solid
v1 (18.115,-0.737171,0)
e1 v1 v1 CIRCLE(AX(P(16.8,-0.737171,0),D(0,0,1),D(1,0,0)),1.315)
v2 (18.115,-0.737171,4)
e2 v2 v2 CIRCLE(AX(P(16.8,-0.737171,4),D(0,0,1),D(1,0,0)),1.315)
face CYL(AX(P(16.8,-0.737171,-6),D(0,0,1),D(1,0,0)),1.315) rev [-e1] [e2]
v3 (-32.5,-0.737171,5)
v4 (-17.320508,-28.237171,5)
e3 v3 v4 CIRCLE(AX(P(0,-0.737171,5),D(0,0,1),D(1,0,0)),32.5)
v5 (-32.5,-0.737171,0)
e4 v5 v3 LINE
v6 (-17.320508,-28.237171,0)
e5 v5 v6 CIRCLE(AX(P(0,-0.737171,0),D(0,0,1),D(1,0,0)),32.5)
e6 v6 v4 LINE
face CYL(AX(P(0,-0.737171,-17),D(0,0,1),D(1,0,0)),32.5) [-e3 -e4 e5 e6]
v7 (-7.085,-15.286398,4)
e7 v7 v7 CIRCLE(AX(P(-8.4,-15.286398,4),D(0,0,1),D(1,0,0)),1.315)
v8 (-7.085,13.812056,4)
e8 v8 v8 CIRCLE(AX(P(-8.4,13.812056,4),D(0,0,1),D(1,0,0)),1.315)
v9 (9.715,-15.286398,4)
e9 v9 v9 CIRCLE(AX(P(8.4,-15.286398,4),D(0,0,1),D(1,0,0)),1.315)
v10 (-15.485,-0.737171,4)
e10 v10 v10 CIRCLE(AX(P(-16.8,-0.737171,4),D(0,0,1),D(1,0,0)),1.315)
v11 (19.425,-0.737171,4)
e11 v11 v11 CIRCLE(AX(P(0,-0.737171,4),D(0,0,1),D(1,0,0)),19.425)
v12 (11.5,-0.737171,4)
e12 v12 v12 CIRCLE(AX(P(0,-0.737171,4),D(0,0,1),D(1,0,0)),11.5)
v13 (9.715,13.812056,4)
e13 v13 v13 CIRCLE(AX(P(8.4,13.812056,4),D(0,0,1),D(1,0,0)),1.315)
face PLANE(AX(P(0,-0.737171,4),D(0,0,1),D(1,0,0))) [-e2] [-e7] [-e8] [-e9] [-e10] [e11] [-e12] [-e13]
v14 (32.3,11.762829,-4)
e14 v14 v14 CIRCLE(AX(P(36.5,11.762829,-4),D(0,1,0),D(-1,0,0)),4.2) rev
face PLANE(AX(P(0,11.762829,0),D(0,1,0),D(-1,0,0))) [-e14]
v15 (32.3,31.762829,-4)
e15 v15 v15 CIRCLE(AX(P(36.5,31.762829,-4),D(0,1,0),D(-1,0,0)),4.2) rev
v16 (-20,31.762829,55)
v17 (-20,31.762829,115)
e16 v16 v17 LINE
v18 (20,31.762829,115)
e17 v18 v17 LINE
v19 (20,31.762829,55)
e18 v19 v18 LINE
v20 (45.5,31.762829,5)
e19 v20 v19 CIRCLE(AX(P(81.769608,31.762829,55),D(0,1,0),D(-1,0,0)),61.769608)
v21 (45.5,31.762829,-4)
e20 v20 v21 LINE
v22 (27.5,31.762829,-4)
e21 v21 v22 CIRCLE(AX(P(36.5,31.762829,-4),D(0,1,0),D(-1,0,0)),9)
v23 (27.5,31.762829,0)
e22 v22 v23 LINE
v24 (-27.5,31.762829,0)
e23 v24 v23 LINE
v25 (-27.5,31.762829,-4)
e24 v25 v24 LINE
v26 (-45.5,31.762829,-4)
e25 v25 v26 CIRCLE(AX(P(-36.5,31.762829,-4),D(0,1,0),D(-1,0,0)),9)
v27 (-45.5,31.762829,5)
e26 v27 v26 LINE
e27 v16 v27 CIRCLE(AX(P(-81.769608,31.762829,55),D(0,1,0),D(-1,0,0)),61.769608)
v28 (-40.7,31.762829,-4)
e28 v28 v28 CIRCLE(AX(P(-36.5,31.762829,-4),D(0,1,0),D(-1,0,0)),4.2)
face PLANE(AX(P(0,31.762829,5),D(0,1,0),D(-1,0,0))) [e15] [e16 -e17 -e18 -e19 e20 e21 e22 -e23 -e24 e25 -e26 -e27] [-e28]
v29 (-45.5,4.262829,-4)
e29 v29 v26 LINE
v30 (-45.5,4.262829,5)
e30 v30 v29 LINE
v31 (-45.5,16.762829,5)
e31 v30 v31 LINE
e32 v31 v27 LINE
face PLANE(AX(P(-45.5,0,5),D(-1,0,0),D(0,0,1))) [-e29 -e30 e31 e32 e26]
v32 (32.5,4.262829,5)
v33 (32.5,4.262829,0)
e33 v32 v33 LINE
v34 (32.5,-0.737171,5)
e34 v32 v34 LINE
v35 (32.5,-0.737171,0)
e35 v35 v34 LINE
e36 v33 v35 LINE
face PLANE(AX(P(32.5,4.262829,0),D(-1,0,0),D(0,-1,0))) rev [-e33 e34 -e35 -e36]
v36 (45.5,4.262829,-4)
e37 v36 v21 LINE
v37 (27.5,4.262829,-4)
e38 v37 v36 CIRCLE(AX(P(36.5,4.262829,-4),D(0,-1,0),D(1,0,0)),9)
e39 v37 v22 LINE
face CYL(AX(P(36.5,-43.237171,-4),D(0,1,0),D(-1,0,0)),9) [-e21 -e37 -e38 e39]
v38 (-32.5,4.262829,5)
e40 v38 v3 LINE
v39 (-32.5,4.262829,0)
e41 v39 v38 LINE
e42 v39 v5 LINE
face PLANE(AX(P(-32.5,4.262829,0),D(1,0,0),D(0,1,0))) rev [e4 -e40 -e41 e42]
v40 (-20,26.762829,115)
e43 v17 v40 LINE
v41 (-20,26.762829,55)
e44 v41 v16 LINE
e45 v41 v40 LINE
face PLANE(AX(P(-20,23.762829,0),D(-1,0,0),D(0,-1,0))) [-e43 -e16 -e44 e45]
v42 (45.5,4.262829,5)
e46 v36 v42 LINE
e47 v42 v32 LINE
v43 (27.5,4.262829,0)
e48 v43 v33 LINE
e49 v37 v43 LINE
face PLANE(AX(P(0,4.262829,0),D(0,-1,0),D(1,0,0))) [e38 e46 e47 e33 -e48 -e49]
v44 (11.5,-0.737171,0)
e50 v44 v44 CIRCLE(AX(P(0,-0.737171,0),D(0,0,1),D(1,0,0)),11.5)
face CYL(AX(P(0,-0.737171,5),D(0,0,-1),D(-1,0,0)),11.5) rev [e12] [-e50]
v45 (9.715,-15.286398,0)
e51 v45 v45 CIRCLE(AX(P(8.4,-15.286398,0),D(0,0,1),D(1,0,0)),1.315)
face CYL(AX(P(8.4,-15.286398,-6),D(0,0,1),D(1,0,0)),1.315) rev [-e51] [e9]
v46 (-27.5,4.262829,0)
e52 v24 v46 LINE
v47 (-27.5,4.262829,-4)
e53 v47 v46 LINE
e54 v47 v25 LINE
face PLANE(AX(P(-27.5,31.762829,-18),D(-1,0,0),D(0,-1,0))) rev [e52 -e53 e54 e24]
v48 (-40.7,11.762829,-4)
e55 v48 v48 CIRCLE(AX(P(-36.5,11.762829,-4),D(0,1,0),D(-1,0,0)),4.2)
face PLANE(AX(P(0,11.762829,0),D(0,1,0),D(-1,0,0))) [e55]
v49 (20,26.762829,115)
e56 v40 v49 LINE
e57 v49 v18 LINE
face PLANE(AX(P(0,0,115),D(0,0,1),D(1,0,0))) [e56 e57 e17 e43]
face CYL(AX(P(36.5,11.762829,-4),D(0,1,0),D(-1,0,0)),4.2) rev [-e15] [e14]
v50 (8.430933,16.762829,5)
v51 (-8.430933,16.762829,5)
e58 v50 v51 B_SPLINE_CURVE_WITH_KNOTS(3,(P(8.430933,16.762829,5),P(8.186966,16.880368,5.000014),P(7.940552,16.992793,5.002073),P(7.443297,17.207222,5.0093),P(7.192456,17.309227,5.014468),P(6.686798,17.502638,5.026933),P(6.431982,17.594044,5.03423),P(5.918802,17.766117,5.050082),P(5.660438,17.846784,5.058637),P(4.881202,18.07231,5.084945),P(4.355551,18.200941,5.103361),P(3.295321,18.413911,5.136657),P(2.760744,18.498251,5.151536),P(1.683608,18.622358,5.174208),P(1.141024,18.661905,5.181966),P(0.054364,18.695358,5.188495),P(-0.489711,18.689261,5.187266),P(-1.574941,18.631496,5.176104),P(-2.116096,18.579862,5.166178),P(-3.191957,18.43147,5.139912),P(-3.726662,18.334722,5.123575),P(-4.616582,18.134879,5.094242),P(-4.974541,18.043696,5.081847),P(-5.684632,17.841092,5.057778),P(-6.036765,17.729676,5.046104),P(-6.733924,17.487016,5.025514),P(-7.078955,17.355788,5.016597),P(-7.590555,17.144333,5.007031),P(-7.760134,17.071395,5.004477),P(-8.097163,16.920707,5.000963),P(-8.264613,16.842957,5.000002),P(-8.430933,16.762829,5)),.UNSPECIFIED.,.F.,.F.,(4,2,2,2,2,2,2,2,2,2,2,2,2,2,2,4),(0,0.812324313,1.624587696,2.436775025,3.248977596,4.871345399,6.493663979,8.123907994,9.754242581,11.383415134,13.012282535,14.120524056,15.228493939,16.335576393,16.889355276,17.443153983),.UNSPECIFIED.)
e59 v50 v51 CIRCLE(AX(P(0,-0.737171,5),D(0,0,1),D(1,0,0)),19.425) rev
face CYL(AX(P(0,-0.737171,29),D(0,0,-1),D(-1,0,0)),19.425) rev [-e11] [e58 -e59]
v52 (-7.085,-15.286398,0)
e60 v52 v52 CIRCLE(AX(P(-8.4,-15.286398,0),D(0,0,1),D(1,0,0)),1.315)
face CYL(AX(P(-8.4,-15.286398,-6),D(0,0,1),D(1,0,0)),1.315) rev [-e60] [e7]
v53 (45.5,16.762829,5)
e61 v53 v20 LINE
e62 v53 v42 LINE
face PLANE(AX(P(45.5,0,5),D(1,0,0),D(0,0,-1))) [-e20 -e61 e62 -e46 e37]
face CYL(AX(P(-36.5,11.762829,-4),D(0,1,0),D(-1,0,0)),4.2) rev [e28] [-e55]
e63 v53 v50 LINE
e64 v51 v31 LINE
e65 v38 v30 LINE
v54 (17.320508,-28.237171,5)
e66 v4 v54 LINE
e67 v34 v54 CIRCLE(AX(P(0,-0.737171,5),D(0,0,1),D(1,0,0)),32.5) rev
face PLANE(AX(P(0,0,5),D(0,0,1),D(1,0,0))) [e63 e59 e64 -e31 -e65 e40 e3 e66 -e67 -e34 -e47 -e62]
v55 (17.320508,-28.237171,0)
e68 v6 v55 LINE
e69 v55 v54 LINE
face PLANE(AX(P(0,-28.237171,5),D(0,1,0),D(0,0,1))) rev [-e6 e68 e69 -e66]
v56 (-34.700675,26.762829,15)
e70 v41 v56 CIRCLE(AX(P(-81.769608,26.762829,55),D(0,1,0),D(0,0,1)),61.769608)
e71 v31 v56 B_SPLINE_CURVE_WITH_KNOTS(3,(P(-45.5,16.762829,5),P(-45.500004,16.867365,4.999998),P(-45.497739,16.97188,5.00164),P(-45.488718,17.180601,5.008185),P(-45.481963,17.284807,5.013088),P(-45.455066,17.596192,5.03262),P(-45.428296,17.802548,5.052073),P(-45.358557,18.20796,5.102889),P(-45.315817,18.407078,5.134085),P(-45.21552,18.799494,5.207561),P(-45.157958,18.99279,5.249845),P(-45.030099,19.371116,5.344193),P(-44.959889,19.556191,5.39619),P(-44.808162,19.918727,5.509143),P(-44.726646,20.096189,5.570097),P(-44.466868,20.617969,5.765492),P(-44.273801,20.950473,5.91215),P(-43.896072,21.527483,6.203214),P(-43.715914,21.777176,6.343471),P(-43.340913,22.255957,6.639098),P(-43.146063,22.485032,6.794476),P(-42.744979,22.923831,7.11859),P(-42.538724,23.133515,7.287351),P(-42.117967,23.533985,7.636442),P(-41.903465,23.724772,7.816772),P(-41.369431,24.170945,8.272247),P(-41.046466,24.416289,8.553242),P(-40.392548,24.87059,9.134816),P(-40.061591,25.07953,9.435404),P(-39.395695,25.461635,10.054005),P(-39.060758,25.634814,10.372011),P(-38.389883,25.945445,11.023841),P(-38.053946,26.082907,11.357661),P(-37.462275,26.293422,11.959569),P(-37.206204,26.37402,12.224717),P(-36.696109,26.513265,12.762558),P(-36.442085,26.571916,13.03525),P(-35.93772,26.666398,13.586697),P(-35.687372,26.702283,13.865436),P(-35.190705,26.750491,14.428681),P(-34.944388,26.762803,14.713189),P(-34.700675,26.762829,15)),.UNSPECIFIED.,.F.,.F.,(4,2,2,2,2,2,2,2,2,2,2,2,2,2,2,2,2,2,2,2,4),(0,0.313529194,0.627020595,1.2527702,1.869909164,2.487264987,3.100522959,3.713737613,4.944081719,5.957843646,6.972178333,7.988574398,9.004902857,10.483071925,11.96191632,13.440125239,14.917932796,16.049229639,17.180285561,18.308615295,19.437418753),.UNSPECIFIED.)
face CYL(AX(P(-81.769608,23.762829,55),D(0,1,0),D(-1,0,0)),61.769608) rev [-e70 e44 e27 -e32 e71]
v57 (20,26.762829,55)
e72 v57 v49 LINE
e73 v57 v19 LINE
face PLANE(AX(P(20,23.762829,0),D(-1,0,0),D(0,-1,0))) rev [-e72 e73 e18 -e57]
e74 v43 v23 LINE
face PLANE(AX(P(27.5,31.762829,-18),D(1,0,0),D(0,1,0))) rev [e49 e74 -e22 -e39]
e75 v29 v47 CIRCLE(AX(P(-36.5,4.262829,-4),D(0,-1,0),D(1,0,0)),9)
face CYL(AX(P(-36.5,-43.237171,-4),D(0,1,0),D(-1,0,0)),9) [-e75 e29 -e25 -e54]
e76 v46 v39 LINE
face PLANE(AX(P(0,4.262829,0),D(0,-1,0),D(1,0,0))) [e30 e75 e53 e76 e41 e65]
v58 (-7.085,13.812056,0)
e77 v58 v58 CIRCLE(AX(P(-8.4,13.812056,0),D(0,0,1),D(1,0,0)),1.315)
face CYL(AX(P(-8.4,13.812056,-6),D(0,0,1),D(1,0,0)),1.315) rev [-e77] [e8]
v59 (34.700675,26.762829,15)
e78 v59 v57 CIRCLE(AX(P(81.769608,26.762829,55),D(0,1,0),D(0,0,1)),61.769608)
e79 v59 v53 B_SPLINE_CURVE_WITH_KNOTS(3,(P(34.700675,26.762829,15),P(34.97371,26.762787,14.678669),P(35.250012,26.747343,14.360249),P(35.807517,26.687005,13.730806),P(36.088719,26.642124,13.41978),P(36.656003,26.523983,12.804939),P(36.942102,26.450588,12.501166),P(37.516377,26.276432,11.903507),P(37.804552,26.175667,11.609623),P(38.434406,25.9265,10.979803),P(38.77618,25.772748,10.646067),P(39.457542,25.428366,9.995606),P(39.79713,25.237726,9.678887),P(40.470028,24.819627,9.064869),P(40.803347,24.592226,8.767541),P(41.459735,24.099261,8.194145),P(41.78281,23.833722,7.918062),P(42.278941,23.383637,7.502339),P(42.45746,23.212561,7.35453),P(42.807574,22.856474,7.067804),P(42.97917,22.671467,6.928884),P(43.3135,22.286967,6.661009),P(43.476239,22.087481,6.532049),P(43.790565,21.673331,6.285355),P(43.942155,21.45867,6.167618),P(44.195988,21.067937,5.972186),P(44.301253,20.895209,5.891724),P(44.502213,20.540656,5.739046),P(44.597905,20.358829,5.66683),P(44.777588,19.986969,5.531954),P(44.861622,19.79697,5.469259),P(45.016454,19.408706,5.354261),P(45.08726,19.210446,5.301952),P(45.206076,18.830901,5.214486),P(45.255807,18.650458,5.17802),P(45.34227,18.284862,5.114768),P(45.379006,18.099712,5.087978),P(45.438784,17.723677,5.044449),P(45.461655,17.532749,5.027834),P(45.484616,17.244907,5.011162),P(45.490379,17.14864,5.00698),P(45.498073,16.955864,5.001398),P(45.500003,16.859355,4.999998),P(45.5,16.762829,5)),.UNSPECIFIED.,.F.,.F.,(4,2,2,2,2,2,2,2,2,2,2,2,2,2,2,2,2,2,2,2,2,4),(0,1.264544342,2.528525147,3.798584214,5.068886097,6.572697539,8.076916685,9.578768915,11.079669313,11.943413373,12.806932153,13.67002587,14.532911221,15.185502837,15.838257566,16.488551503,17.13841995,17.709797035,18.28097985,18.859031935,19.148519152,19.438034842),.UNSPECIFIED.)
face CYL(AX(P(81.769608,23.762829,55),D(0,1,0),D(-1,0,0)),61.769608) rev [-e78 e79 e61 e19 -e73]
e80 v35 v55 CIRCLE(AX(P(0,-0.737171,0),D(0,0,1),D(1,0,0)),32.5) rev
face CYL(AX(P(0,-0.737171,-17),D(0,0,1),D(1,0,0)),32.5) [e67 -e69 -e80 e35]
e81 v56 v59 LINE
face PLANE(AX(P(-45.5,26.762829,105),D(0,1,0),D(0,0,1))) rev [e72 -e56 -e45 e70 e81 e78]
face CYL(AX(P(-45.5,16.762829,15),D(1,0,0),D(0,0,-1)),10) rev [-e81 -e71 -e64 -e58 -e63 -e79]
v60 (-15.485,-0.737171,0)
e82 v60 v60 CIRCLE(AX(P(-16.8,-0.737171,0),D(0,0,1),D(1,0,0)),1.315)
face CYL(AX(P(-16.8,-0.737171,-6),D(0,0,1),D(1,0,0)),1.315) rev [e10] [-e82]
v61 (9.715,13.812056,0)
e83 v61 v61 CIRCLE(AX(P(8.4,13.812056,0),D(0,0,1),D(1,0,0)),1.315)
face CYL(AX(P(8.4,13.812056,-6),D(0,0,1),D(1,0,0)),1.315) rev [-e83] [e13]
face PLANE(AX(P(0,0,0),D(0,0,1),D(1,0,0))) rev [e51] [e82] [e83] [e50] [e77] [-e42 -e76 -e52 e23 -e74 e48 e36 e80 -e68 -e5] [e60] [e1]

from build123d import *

# Parameters (mm, degrees)
SKETCH1_W                = 9
SKETCH1_H                = 55
SKETCH1_W_2              = 91
SKETCH1_H_2              = 5
BOSS_EXTRUDE3_DEPTH      = 5
SKETCH6_W                = 18
SKETCH6_H                = 60
BOSS_EXTRUDE4_DEPTH      = 18
SKETCH7_W                = 91
SKETCH7_H                = 5
BOSS_EXTRUDE5_DEPTH      = 100
SKETCH13_W               = 18
SKETCH13_H               = 5
CUT_EXTRUDE6_DEPTH       = 75
SKETCH16_R               = 4.2
CUT_EXTRUDE7_DEPTH       = 20
CUT_EXTRUDE8_DEPTH       = 75
CUT_EXTRUDE10_DEPTH      = 8
CUT_EXTRUDE11_DEPTH      = 22
CUT_EXTRUDE14_DEPTH      = 34
CUT_EXTRUDE14_DEPTH_BACK = 5
FILLET4_R                = 10
CUT_EXTRUDE15_DEPTH      = 24
CUT_EXTRUDE15_DEPTH_BACK = 1
SKETCH23_R               = 19.425
SKETCH24_R               = 1.315
CUT_EXTRUDE16_DEPTH      = 10
SKETCH26_W               = 40
SKETCH26_H               = 5
BOSS_EXTRUDE6_DEPTH      = 10


with BuildPart() as part:
    # Sketch1 → Boss-Extrude3 (new body)
    with BuildSketch(Plane.XY):
        with Locations((41, -0.737170899)):
            Rectangle(SKETCH1_W, SKETCH1_H)
        with Locations((32, -0.737170899)):
            Rectangle(SKETCH1_W, SKETCH1_H)
        with BuildLine():
            Line((27.5, 26.762829101), (0, 26.762829101))
            Line((0, 26.762829101), (0, 10.762829101))
            ThreePointArc((0, 10.762829101), (8.131727984, 7.394557085), (11.5, -0.737170899))
            ThreePointArc((11.5, -0.737170899), (8.131727984, -8.868898883), (0, -12.237170899))
            Line((0, -12.237170899), (0, -28.237170899))
            Line((0, -28.237170899), (27.5, -28.237170899))
            Line((27.5, -28.237170899), (27.5, 26.762829101))
        make_face()
        with BuildLine():
            Line((0, 10.762829101), (0, 26.762829101))
            Line((0, 26.762829101), (-27.5, 26.762829101))
            Line((-27.5, 26.762829101), (-27.5, -28.237170899))
            Line((-27.5, -28.237170899), (0, -28.237170899))
            Line((0, -28.237170899), (0, -12.237170899))
            ThreePointArc((0, -12.237170899), (-11.5, -0.737170899), (0, 10.762829101))
        make_face()
        with Locations((-32, -0.737170899)):
            Rectangle(SKETCH1_W, SKETCH1_H)
        with Locations((-41, -0.737170899)):
            Rectangle(SKETCH1_W, SKETCH1_H)
        with Locations((0, 29.262829101)):
            Rectangle(SKETCH1_W_2, SKETCH1_H_2)
    extrude(amount=BOSS_EXTRUDE3_DEPTH)

    # Sketch6 → Boss-Extrude4 (add)
    with BuildSketch(Plane(origin=(0, 0, 0), x_dir=(-1, 0, 0), z_dir=(0, 0, -1))):
        with Locations((-36.5, 1.762829101)):
            Rectangle(SKETCH6_W, SKETCH6_H)
        with Locations((36.5, 1.762829101)):
            Rectangle(SKETCH6_W, SKETCH6_H)
    extrude(amount=BOSS_EXTRUDE4_DEPTH)

    # Sketch7 → Boss-Extrude5 (add)
    with BuildSketch(Plane.XY.offset(5)):
        with Locations((0, 29.262829101)):
            Rectangle(SKETCH7_W, SKETCH7_H)
    extrude(amount=BOSS_EXTRUDE5_DEPTH)

    # Sketch13 → Cut-Extrude6 (cut)
    with BuildSketch(Plane(origin=(0, 31.762829101, 0), x_dir=(1, 0, 0), z_dir=(0, 1, 0))):
        with Locations((-36.5, 15.5)):
            Rectangle(SKETCH13_W, SKETCH13_H)
        with Locations((36.5, 15.5)):
            Rectangle(SKETCH13_W, SKETCH13_H)
    extrude(amount=-CUT_EXTRUDE6_DEPTH, mode=Mode.SUBTRACT)

    # Sketch16 → Cut-Extrude7 (cut)
    with BuildSketch(Plane(origin=(0, 31.762829101, 0), x_dir=(1, 0, 0), z_dir=(0, 1, 0))):
        with Locations(Location((-36.5, 4, 0), (0, 0, 180))):
            Circle(SKETCH16_R)
        with Locations(Location((36.5, 4, 0), (0, 0, 180))):
            Circle(SKETCH16_R)
    extrude(amount=-CUT_EXTRUDE7_DEPTH, mode=Mode.SUBTRACT)

    # Sketch17 → Cut-Extrude8 (cut)
    with BuildSketch(Plane(origin=(0, 31.762829101, 0), x_dir=(1, 0, 0), z_dir=(0, 1, 0))):
        with BuildLine():
            Line((-45.5, 13), (-45.5, 4))
            ThreePointArc((-45.5, 4), (-42.863961031, 10.363961031), (-36.5, 13))
            Line((-36.5, 13), (-45.5, 13))
        make_face()
        with BuildLine():
            ThreePointArc((-36.5, 13), (-30.136038969, 10.363961031), (-27.5, 4))
            Line((-27.5, 4), (-27.5, 13))
            Line((-27.5, 13), (-36.5, 13))
        make_face()
        with BuildLine():
            Line((27.5, 13), (27.5, 4))
            ThreePointArc((27.5, 4), (30.136038969, 10.363961031), (36.5, 13))
            Line((36.5, 13), (27.5, 13))
        make_face()
        with BuildLine():
            Line((45.5, 13), (36.5, 13))
            ThreePointArc((36.5, 13), (42.863961031, 10.363961031), (45.5, 4))
            Line((45.5, 4), (45.5, 13))
        make_face()
    extrude(amount=-CUT_EXTRUDE8_DEPTH, mode=Mode.SUBTRACT)

    # Sketch18 → Cut-Extrude10 (cut)
    with BuildSketch(Plane(origin=(0, 31.762829101, 0), x_dir=(1, 0, 0), z_dir=(0, 1, 0))):
        with BuildLine():
            ThreePointArc((-45.5, -105), (-26.743051045, -83.063543967), (-20, -55))
            Line((-20, -55), (-45.5, -55))
            Line((-45.5, -55), (-45.5, -105))
        make_face()
        with BuildLine():
            Line((-45.5, -55), (-20, -55))
            ThreePointArc((-20, -55), (-26.743051045, -26.936456033), (-45.5, -5))
            Line((-45.5, -5), (-45.5, -55))
        make_face()
        with BuildLine():
            ThreePointArc((-45.5, -105), (-26.743051045, -83.063543967), (-20, -55))
            Line((-20, -55), (-45.5, -55))
            Line((-45.5, -55), (-45.5, -105))
        make_face()
        with BuildLine():
            Line((-45.5, -55), (-20, -55))
            ThreePointArc((-20, -55), (-26.743051045, -26.936456033), (-45.5, -5))
            Line((-45.5, -5), (-45.5, -55))
        make_face()
        with BuildLine():
            Line((-20, -105), (-20, -55))
            ThreePointArc((-20, -55), (-26.743051045, -83.063543967), (-45.5, -105))
            Line((-45.5, -105), (-20, -105))
        make_face()
        with BuildLine():
            Line((20, -55), (20, -105))
            Line((20, -105), (45.5, -105))
            ThreePointArc((45.5, -105), (26.743051045, -83.063543967), (20, -55))
        make_face()
        with BuildLine():
            Line((45.5, -55), (45.5, -5))
            ThreePointArc((45.5, -5), (26.743051045, -26.936456033), (20, -55))
            Line((20, -55), (45.5, -55))
        make_face()
        with BuildLine():
            ThreePointArc((20, -55), (26.743051045, -83.063543967), (45.5, -105))
            Line((45.5, -105), (45.5, -55))
            Line((45.5, -55), (20, -55))
        make_face()
        with BuildLine():
            Line((45.5, -55), (45.5, -5))
            ThreePointArc((45.5, -5), (26.743051045, -26.936456033), (20, -55))
            Line((20, -55), (45.5, -55))
        make_face()
        with BuildLine():
            ThreePointArc((20, -55), (26.743051045, -83.063543967), (45.5, -105))
            Line((45.5, -105), (45.5, -55))
            Line((45.5, -55), (20, -55))
        make_face()
    extrude(amount=-CUT_EXTRUDE10_DEPTH, mode=Mode.SUBTRACT)

    # Sketch19 → Cut-Extrude11 (cut)
    with BuildSketch(Plane.XY.offset(5)):
        with BuildLine():
            Line((-32.5, -0.737170899), (-45.5, -0.737170899))
            Line((-45.5, -0.737170899), (-45.5, -28.237170899))
            Line((-45.5, -28.237170899), (-17.320508076, -28.237170899))
            ThreePointArc((-17.320508076, -28.237170899), (-28.453176558, -16.442798673), (-32.5, -0.737170899))
        make_face()
        with BuildLine():
            Line((45.5, -28.237170899), (17.320508076, -28.237170899))
            ThreePointArc((17.320508076, -28.237170899), (28.453176558, -16.442798673), (32.5, -0.737170899))
            Line((32.5, -0.737170899), (45.5, -0.737170899))
            Line((45.5, -0.737170899), (45.5, -28.237170899))
        make_face()
    extrude(amount=-CUT_EXTRUDE11_DEPTH, mode=Mode.SUBTRACT)

    # Sketch21 → Cut-Extrude14 (cut, two sides: drawn at the far end of the back side and taken through both)
    with BuildSketch(Plane.XZ.offset(0.737170899).offset(-CUT_EXTRUDE14_DEPTH_BACK)):
        with BuildLine():
            Line((27.5, 0), (32.5, 0))
            Line((32.5, 0), (32.5, 5))
            Line((32.5, 5), (45.5, 5))
            Line((45.5, 5), (45.5, -4))
            ThreePointArc((45.5, -4), (36.5, -13), (27.5, -4))
            Line((27.5, -4), (27.5, 0))
        make_face()
        with BuildLine():
            Line((-27.5, -4), (-27.5, 0))
            Line((-27.5, 0), (-32.5, 0))
            Line((-32.5, 0), (-32.5, 5))
            Line((-32.5, 5), (-45.5, 5))
            Line((-45.5, 5), (-45.5, -4))
            ThreePointArc((-45.5, -4), (-36.5, -13), (-27.5, -4))
        make_face()
    extrude(amount=CUT_EXTRUDE14_DEPTH + CUT_EXTRUDE14_DEPTH_BACK, mode=Mode.SUBTRACT)

    # Fillet4
    # the kernel refuses this fillet: 10 mm, written as the material it adds along each edge
    with BuildSketch(Plane(origin=(70.5, 26.762829101, 5), x_dir=(0, -1, 0), z_dir=(-1, 0, 0))) as fillet4_piece_1_section:
        with BuildLine():
            CenterArc((FILLET4_R, FILLET4_R), FILLET4_R, 180, 90)
            Line((0, FILLET4_R), (0, 0))
            Line((0, 0), (FILLET4_R, 0))
        make_face()
    fillet4_piece_1 = extrude(amount=141, mode=Mode.PRIVATE)
    fillet4_piece_1 = fillet4_piece_1 - Plane(origin=(-81.769607843, 24.471447362, 55), x_dir=(0.5871756209824568, 0, 0.8094595667010591), z_dir=(0, 1, 0)) * Cylinder(61.769607843, 322, mode=Mode.PRIVATE)
    fillet4_piece_1 = fillet4_piece_1 - Plane(origin=(81.769607843, 24.471447362, 55), x_dir=(-0.5871756209824566, 0, -0.8094595667010592), z_dir=(0, 1, 0)) * Cylinder(61.769607843, 322, mode=Mode.PRIVATE)
    add(fillet4_piece_1)

    # Sketch23 → Cut-Extrude15 (cut, two sides: drawn at the far end of the back side and taken through both)
    with BuildSketch(Plane.XY.offset(5).offset(-CUT_EXTRUDE15_DEPTH_BACK)):
        with Locations(Location((0, -0.737170899, 0), (0, 0, 115.723259522))):
            Circle(SKETCH23_R)
    extrude(amount=CUT_EXTRUDE15_DEPTH + CUT_EXTRUDE15_DEPTH_BACK, mode=Mode.SUBTRACT)

    # Sketch24 → Cut-Extrude16 (cut)
    with BuildSketch(Plane.XY.offset(4)):
        with Locations((-8.4, 13.812055885)):
            Circle(SKETCH24_R)
        with Locations((8.4, -15.286397682)):
            Circle(SKETCH24_R)
        with Locations((-8.4, -15.286397682)):
            Circle(SKETCH24_R)
        with Locations((16.8, -0.737170899)):
            Circle(SKETCH24_R)
        with Locations((-16.8, -0.737170899)):
            Circle(SKETCH24_R)
        with Locations((8.4, 13.812055885)):
            Circle(SKETCH24_R)
    extrude(amount=-CUT_EXTRUDE16_DEPTH, mode=Mode.SUBTRACT)

    # Sketch26 → Boss-Extrude6 (add)
    with BuildSketch(Plane.XY.offset(105)):
        with Locations((0, 29.262829101)):
            Rectangle(SKETCH26_W, SKETCH26_H)
    extrude(amount=BOSS_EXTRUDE6_DEPTH)


solid = part.part
